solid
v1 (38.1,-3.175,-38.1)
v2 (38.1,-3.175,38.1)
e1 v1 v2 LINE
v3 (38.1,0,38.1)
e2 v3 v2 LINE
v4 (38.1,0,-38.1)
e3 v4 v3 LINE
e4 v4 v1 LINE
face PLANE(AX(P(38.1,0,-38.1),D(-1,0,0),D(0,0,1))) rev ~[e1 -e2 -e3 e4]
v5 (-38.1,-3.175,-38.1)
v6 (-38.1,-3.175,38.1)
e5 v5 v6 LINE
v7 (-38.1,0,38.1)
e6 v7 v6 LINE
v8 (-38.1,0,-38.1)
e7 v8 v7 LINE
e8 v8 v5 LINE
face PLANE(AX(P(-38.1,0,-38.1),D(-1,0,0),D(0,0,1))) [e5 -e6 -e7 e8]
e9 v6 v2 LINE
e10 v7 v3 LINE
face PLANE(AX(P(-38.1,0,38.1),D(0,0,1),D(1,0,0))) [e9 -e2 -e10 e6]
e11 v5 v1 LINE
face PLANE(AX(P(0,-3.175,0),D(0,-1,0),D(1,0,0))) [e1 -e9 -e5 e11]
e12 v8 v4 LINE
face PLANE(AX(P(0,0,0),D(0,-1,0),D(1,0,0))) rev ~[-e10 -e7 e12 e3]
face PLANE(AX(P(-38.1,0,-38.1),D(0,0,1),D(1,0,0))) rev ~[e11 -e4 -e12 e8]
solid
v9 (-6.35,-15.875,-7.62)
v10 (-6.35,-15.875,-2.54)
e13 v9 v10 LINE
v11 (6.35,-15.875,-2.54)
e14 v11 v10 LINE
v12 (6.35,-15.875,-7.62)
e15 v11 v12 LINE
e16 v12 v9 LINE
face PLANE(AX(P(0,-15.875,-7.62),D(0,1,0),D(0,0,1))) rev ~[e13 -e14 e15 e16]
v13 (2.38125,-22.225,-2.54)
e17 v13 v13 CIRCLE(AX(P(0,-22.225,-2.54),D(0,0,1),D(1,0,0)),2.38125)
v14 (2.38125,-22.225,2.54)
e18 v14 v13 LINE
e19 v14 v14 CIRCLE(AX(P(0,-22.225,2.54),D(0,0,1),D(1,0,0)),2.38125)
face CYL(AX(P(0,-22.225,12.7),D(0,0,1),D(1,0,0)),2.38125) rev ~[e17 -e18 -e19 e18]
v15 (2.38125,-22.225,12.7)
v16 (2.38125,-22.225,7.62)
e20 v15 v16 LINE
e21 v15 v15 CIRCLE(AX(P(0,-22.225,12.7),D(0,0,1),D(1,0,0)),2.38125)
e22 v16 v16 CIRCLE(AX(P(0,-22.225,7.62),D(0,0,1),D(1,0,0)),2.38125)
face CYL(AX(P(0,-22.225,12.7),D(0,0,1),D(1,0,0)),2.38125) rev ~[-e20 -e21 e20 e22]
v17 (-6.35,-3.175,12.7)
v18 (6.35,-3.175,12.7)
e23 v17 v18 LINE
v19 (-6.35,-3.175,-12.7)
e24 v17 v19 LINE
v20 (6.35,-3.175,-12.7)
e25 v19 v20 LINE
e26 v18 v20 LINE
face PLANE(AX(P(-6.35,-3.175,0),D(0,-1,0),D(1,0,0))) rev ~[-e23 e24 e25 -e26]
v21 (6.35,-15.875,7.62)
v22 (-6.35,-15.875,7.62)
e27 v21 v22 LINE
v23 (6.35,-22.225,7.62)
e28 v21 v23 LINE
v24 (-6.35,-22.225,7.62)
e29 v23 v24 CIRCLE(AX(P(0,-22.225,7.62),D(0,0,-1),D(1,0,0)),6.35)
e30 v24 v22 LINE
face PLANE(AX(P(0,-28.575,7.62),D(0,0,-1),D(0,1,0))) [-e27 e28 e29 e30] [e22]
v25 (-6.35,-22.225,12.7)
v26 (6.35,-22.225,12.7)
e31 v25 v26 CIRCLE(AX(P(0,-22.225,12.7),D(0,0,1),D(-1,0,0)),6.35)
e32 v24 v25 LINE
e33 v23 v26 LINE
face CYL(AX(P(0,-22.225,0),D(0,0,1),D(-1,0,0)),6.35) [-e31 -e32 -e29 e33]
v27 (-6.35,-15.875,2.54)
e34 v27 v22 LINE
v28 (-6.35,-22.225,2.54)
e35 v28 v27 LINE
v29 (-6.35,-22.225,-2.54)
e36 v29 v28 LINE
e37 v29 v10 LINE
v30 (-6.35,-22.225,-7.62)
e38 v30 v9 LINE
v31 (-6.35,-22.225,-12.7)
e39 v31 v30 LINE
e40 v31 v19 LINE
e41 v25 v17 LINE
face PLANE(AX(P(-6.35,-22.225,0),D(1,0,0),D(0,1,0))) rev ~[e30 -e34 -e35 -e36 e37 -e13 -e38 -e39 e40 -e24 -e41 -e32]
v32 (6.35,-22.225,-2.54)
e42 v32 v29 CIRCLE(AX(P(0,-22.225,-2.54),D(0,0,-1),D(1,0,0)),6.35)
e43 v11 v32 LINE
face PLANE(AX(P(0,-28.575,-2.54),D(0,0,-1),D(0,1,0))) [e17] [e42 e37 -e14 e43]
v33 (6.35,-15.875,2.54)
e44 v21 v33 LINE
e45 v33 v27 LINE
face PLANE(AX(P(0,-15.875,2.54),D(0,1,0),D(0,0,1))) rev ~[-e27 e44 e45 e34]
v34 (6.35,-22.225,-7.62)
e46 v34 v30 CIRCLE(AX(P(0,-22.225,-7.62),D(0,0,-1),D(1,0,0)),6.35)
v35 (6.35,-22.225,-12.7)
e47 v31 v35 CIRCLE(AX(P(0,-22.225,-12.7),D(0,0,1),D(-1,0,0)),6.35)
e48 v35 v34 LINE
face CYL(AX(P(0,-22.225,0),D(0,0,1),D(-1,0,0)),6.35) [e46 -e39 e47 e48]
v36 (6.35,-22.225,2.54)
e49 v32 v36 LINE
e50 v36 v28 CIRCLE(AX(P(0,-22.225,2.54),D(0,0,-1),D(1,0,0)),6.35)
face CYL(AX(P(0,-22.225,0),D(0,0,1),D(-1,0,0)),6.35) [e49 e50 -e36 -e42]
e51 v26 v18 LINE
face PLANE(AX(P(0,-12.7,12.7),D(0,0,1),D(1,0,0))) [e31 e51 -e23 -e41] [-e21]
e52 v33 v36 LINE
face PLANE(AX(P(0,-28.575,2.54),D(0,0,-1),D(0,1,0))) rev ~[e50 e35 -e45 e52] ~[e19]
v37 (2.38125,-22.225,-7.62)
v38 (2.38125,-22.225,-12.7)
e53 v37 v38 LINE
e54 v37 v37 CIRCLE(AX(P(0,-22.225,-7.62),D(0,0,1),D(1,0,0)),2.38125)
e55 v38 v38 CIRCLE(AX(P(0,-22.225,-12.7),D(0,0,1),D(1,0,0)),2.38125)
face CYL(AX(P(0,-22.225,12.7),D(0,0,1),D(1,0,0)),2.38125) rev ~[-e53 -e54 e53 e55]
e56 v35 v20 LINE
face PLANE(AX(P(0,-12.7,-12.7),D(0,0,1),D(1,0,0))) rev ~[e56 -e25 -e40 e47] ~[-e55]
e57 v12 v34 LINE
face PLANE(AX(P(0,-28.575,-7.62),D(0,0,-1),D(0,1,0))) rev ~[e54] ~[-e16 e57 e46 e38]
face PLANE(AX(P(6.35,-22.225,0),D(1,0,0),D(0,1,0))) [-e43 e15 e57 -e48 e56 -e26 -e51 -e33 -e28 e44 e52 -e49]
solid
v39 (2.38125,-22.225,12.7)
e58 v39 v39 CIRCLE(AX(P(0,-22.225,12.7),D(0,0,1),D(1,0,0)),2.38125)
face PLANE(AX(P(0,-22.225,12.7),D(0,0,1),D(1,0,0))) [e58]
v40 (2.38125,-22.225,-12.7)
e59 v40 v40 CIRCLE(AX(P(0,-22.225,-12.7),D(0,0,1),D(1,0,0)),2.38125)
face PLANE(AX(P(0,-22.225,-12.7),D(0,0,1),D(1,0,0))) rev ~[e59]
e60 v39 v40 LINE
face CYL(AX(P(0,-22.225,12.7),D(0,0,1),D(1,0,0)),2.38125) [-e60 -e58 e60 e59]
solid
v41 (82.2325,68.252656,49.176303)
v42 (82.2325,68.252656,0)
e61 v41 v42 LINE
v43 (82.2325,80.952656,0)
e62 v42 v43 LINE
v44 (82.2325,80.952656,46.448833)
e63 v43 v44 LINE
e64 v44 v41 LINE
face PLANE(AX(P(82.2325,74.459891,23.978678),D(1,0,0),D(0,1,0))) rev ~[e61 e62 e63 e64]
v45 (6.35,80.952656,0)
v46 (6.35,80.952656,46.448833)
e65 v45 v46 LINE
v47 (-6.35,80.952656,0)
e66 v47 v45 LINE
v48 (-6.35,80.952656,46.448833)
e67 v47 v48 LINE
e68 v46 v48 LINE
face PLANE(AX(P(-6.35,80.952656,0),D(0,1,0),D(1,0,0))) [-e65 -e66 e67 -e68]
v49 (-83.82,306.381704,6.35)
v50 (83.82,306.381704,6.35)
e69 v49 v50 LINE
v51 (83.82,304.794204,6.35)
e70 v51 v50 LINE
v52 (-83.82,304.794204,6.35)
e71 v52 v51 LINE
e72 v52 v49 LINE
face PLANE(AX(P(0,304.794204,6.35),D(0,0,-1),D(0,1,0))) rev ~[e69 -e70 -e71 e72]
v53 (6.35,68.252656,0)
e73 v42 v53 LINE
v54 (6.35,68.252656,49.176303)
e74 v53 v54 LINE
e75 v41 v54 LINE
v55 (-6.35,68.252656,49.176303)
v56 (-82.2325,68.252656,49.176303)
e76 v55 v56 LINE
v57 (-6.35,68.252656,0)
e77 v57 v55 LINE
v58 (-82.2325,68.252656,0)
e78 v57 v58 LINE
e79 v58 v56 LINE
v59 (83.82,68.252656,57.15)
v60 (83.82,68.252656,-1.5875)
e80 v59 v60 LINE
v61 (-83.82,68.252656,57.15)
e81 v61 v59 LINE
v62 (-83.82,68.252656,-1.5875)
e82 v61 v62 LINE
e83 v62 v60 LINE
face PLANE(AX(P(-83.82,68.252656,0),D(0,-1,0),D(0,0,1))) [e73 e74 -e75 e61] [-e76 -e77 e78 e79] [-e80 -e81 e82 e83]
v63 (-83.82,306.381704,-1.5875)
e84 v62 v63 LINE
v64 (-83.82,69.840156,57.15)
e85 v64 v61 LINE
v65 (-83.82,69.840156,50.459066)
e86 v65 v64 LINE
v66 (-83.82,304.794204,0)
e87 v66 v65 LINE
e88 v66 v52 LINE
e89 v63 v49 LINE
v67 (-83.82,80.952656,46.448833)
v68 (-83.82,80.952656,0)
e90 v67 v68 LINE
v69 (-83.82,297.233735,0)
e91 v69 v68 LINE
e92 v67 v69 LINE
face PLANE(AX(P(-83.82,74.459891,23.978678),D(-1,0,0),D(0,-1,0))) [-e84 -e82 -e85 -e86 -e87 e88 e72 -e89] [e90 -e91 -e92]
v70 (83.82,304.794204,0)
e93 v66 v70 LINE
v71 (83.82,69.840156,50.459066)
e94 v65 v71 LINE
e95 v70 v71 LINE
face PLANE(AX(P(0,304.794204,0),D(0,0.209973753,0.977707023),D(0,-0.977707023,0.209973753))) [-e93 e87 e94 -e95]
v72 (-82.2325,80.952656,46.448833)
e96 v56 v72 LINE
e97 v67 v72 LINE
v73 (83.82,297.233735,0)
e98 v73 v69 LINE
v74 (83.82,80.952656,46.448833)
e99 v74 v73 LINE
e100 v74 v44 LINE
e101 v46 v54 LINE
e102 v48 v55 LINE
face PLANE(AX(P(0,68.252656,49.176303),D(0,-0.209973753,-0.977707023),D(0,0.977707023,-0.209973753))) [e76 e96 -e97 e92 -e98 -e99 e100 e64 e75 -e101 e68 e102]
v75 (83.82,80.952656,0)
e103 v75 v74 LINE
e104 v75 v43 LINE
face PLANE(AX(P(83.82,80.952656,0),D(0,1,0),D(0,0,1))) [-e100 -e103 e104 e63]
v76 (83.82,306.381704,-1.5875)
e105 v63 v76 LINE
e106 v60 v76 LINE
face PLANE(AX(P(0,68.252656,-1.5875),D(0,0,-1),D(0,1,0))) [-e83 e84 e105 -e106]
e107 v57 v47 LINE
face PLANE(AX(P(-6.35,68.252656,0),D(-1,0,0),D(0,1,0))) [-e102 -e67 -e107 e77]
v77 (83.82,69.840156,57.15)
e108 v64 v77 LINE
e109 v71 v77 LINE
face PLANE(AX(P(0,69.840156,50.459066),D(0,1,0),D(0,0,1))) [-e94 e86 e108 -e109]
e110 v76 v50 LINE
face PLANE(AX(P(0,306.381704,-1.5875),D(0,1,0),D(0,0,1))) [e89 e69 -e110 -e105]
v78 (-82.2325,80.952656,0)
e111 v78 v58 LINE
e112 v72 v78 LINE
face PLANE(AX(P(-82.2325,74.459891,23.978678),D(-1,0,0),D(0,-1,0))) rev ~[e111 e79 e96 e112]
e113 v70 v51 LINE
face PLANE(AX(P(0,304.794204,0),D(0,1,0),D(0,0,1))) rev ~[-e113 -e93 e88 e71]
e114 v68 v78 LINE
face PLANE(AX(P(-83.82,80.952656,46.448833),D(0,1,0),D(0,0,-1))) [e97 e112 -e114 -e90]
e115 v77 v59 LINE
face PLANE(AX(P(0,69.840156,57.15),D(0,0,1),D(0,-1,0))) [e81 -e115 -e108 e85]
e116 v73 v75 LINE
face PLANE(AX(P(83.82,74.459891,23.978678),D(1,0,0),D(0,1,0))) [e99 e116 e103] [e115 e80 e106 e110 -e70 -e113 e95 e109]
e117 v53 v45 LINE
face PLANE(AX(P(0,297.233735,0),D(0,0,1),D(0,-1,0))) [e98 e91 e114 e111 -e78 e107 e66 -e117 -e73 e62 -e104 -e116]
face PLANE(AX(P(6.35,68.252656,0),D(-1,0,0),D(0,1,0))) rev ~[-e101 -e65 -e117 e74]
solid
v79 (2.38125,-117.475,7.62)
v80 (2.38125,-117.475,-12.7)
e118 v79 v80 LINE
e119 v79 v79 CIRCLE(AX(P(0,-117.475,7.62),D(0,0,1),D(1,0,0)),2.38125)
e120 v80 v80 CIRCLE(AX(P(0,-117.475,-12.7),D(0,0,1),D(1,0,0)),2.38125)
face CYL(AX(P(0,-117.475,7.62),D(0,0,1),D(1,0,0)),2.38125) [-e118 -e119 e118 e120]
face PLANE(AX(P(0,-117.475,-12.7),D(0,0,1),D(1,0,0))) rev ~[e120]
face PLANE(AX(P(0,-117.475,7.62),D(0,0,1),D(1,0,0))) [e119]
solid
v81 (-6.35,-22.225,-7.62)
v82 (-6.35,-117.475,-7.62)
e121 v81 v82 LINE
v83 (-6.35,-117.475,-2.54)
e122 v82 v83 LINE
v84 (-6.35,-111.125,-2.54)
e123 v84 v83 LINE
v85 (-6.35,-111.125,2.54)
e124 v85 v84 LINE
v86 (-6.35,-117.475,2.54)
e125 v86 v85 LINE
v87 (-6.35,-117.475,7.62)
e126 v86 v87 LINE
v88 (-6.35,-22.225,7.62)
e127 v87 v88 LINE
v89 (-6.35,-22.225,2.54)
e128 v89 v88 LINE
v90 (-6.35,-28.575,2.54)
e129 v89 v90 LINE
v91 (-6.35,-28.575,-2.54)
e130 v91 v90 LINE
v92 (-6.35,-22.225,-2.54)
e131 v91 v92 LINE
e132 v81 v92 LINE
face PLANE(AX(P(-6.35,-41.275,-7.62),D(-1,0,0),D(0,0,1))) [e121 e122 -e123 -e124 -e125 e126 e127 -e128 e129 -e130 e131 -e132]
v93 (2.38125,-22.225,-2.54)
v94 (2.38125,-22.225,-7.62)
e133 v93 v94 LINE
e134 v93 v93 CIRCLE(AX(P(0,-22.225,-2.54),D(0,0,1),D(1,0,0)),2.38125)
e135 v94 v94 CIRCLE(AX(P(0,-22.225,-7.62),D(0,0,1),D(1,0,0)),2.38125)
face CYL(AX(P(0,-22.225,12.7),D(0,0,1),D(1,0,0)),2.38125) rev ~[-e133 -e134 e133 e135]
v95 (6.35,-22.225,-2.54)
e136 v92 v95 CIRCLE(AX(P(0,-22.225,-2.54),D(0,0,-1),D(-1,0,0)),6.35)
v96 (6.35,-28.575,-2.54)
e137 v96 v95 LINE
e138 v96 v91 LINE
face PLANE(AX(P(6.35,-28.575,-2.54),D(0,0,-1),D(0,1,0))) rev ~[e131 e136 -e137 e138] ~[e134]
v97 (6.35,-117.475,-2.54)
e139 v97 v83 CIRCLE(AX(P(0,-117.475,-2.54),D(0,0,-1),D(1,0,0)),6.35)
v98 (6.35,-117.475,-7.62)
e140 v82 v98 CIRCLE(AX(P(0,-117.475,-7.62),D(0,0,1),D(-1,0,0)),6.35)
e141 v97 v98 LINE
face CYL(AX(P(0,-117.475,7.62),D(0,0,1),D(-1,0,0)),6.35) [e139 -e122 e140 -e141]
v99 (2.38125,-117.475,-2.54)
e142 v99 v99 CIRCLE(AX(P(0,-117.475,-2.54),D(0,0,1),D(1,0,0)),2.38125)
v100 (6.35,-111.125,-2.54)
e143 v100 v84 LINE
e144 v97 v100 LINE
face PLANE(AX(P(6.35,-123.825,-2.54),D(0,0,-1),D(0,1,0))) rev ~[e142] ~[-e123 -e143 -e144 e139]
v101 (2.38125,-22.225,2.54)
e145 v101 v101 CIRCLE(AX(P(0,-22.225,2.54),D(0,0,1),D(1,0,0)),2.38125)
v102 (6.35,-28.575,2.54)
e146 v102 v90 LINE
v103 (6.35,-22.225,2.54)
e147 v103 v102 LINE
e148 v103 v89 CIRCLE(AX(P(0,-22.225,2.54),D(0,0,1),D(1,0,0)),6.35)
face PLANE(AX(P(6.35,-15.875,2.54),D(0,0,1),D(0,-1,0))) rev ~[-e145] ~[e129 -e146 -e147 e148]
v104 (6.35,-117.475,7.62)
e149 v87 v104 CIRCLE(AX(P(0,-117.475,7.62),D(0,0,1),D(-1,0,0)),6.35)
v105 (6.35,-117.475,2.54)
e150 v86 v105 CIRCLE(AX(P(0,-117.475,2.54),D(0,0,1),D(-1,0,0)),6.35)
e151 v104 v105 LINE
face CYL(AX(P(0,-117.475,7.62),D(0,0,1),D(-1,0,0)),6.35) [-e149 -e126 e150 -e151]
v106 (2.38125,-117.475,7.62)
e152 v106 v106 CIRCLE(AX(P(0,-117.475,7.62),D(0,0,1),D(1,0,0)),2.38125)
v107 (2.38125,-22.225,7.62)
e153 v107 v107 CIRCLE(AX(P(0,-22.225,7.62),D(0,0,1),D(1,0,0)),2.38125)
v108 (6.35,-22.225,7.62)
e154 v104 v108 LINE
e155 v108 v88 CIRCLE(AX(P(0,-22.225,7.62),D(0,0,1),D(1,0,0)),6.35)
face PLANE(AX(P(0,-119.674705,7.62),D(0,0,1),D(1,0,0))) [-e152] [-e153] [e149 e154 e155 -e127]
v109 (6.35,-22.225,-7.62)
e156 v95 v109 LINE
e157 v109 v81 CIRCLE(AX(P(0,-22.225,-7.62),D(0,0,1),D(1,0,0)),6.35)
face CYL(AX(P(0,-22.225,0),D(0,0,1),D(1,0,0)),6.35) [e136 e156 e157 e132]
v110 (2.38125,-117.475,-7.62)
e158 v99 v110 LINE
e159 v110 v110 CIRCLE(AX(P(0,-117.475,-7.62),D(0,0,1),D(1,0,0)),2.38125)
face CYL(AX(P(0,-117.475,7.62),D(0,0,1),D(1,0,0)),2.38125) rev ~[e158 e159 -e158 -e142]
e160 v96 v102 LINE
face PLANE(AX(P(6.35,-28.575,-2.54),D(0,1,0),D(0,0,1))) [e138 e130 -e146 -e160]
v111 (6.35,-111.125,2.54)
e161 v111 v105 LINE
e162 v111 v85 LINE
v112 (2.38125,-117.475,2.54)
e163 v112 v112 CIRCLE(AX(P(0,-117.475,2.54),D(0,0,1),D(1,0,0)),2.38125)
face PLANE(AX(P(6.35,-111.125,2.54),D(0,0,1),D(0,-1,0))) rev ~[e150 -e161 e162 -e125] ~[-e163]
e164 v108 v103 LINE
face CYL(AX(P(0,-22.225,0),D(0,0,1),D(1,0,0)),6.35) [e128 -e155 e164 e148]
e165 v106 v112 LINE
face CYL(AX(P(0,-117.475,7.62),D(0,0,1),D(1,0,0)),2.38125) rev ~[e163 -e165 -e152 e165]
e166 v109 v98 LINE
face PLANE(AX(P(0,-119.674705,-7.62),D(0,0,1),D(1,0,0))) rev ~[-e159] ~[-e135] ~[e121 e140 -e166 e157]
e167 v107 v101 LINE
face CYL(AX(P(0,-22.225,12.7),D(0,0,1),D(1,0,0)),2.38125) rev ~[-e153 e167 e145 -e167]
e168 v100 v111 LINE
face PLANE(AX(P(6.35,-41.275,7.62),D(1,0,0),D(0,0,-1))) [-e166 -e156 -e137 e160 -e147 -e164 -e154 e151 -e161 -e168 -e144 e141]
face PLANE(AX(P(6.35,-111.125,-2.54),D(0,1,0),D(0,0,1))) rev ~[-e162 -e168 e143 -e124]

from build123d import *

# Parameters (mm, degrees)
F0_W          = 76.2
F0_H          = 76.2
F1_DEPTH      = 3.175
F2_W          = 12.7
F2_H          = 19.05
F3_DEPTH      = 12.7
F4_W          = 12.7
F4_H          = 5.08
F5_DEPTH      = 38.101
F5_DEPTH_BACK = 38.101
F6_W          = 12.7
F6_H          = 19.05
F7_DEPTH      = 7.62
F8_W          = 6.35
F8_H          = 5.08
F9_DEPTH      = 25.4
F10_R         = 2.38125
F11_DEPTH     = 50.801
F12_DEPTH     = 76.2
F14_DEPTH     = 15.24
F15_W         = 6.35
F15_H         = 5.08
F16_DEPTH     = 44.451
F17_R         = 2.38125
F18_DEPTH     = 45.721
F19_W         = 12.7
F19_H         = 12.7
F20_DEPTH     = 50.8
F22_DEPTH     = 44.451
F23_W         = 1.5875
F23_H         = 6.35
F24_DEPTH     = 83.82
F26_DEPTH     = 1.5875
F28_DEPTH     = 1.5875
F29_R         = 2.38125
F30_DEPTH     = 25.4
F31_R         = 2.38125
F32_DEPTH     = 20.32


with BuildPart() as f1:
    # F0 (on Front) → F1 (new body)
    with BuildSketch(Plane.XZ):
        Rectangle(F0_W, F0_H)
    extrude(amount=F1_DEPTH)


with BuildPart() as f3:
    # F2 (on Top) → F3 (new body, symmetric)
    with BuildSketch(Plane.XY):
        with Locations((0, -12.7)):
            Rectangle(F2_W, F2_H)
        with BuildLine():
            ThreePointArc((-6.35, -22.225), (0, -28.575), (6.35, -22.225))
            Line((6.35, -22.225), (-6.35, -22.225))
        make_face()
    extrude(amount=F3_DEPTH, both=True)

    # F4 (on Right) → F5 (cut, two sides)
    with BuildSketch(Plane.YZ) as f5_sk:
        with Locations((-22.225, 5.08)):
            Rectangle(F4_W, F4_H)
        with Locations((-22.225, -5.08)):
            Rectangle(F4_W, F4_H)
    extrude(amount=-F5_DEPTH, mode=Mode.SUBTRACT)
    extrude(f5_sk.sketch, amount=F5_DEPTH_BACK, mode=Mode.SUBTRACT)


with BuildPart() as f7:
    # F6 (on Top) → F7 (new body, symmetric)
    with BuildSketch(Plane.XY):
        with BuildLine():
            Line((-6.35, -22.225), (6.35, -22.225))
            ThreePointArc((6.35, -22.225), (0, -15.875), (-6.35, -22.225))
        make_face()
        with Locations((0, -31.75)):
            Rectangle(F6_W, F6_H)
    extrude(amount=F7_DEPTH, both=True)

    # F8 (on face) → F9 (cut)
    with BuildSketch(Plane.YZ.offset(6.35)):
        Polygon((-3.175, 12.7), (-22.225, 12.7), (-22.225, 7.62), (-15.875, 7.62), (-15.875, 2.54), (-22.225, 2.54), (-22.225, -2.54), (-15.875, -2.54), (-15.875, -7.62), (-22.225, -7.62), (-22.225, -12.7), (-3.175, -12.7), align=None)
        with Locations((-25.4, 0)):
            Rectangle(F8_W, F8_H)
    extrude(amount=-F9_DEPTH, mode=Mode.SUBTRACT)


with BuildPart() as f11_tool:
    # F10 (on face) → F11 (new body, through all)
    with BuildSketch(Plane.XY.offset(12.7)):
        with Locations((0, -22.225)):
            Circle(F10_R)
    extrude(amount=-F11_DEPTH)


with BuildPart() as f3_1:
    add(f3.part)

    # F11: cut by f11_tool
    add(f11_tool.part, mode=Mode.SUBTRACT)


with BuildPart() as f7_1:
    add(f7.part)

    # F11: cut by f11_tool
    add(f11_tool.part, mode=Mode.SUBTRACT)

    # F12 (add): a face of the model
    f12_faces = [f7_1.faces().sort_by_distance(p)[0] for p in [
        (0, -41.275, 0),
    ]]
    extrude(f12_faces, amount=F12_DEPTH)

    # F13 (on face) → F14 (join)
    with BuildSketch(Plane.XY.offset(7.62)):
        with BuildLine():
            Line((6.35, -117.475), (-6.35, -117.475))
            ThreePointArc((-6.35, -117.475), (0, -123.825), (6.35, -117.475))
        make_face()
    extrude(amount=-F14_DEPTH)

    # F15 (on face) → F16 (cut, through all)
    with BuildSketch(Plane.YZ.offset(6.35)):
        with Locations((-120.65, 0)):
            Rectangle(F15_W, F15_H)
        with Locations((-114.3, 0)):
            Rectangle(F15_W, F15_H)
    extrude(amount=-F16_DEPTH, mode=Mode.SUBTRACT)

    # F17 (on face) → F18 (cut, through all)
    with BuildSketch(Plane.XY.offset(7.62)):
        with Locations((0, -117.475)):
            Circle(F17_R)
    extrude(amount=-F18_DEPTH, mode=Mode.SUBTRACT)


with BuildPart() as f20:
    # F19 (on Top) → F20 (new body)
    with BuildSketch(Plane.XY):
        with Locations((0, 74.602655525)):
            Rectangle(F19_W, F19_H)
    extrude(amount=F20_DEPTH)

    # F21 (on face) → F22 (cut, through all)
    with BuildSketch(Plane.YZ.offset(6.35)):
        Polygon((68.252655525, 56.2568344176), (68.252655525, 50.8), (80.952655525, 48.0725299054), (81.430234015, 56.2568344176), align=None)
    extrude(amount=-F22_DEPTH, mode=Mode.SUBTRACT)

    # F23 (on Right) → F24 (join, symmetric)
    with BuildSketch(Plane.YZ):
        Polygon((297.2337353981, 0), (68.252655525, 0), (68.252655525, -1.5875), (306.3817041481, -1.5875), (306.3817041481, 0), (304.7942041481, 0), align=None)
        Polygon((68.252655525, 49.1763029593), (297.2337353981, 0), (304.7942041481, 0), (69.840155525, 50.4590662382), (68.252655525, 50.8), align=None)
        with Locations((305.5879541481, 3.175)):
            Rectangle(F23_W, F23_H)
        Polygon((68.252655525, 50.8), (69.840155525, 50.4590662382), (69.840155525, 57.15), (68.252655525, 57.15), align=None)
    extrude(amount=F24_DEPTH, both=True)

    # F25 (on face) → F26 (join)
    with BuildSketch(Plane.YZ.offset(83.82)):
        Polygon((80.952655525, 0), (80.952655525, 46.4488328647), (68.252655525, 49.1763029593), (68.252655525, 0), align=None)
    extrude(amount=-F26_DEPTH)

    # F27 (on face) → F28 (join)
    with BuildSketch(Plane(origin=(-83.82, 0, 0), x_dir=(0, -1, 0), z_dir=(-1, 0, 0))):
        Polygon((-80.952655525, 0), (-68.252655525, 0), (-68.252655525, 49.1763029593), (-80.952655525, 46.4488328647), align=None)
    extrude(amount=-F28_DEPTH)


with BuildPart() as f30:
    # F29 (on face) → F30 (new body)
    with BuildSketch(Plane.XY.offset(12.7)):
        with Locations((0, -22.225)):
            Circle(F29_R)
    extrude(amount=-F30_DEPTH)


with BuildPart() as f32:
    # F31 (on face) → F32 (new body)
    with BuildSketch(Plane.XY.offset(7.62)):
        with Locations((0, -117.475)):
            Circle(F31_R)
    extrude(amount=-F32_DEPTH)


solid = Compound([f1.part, f3_1.part, f7_1.part, f20.part, f30.part, f32.part])
